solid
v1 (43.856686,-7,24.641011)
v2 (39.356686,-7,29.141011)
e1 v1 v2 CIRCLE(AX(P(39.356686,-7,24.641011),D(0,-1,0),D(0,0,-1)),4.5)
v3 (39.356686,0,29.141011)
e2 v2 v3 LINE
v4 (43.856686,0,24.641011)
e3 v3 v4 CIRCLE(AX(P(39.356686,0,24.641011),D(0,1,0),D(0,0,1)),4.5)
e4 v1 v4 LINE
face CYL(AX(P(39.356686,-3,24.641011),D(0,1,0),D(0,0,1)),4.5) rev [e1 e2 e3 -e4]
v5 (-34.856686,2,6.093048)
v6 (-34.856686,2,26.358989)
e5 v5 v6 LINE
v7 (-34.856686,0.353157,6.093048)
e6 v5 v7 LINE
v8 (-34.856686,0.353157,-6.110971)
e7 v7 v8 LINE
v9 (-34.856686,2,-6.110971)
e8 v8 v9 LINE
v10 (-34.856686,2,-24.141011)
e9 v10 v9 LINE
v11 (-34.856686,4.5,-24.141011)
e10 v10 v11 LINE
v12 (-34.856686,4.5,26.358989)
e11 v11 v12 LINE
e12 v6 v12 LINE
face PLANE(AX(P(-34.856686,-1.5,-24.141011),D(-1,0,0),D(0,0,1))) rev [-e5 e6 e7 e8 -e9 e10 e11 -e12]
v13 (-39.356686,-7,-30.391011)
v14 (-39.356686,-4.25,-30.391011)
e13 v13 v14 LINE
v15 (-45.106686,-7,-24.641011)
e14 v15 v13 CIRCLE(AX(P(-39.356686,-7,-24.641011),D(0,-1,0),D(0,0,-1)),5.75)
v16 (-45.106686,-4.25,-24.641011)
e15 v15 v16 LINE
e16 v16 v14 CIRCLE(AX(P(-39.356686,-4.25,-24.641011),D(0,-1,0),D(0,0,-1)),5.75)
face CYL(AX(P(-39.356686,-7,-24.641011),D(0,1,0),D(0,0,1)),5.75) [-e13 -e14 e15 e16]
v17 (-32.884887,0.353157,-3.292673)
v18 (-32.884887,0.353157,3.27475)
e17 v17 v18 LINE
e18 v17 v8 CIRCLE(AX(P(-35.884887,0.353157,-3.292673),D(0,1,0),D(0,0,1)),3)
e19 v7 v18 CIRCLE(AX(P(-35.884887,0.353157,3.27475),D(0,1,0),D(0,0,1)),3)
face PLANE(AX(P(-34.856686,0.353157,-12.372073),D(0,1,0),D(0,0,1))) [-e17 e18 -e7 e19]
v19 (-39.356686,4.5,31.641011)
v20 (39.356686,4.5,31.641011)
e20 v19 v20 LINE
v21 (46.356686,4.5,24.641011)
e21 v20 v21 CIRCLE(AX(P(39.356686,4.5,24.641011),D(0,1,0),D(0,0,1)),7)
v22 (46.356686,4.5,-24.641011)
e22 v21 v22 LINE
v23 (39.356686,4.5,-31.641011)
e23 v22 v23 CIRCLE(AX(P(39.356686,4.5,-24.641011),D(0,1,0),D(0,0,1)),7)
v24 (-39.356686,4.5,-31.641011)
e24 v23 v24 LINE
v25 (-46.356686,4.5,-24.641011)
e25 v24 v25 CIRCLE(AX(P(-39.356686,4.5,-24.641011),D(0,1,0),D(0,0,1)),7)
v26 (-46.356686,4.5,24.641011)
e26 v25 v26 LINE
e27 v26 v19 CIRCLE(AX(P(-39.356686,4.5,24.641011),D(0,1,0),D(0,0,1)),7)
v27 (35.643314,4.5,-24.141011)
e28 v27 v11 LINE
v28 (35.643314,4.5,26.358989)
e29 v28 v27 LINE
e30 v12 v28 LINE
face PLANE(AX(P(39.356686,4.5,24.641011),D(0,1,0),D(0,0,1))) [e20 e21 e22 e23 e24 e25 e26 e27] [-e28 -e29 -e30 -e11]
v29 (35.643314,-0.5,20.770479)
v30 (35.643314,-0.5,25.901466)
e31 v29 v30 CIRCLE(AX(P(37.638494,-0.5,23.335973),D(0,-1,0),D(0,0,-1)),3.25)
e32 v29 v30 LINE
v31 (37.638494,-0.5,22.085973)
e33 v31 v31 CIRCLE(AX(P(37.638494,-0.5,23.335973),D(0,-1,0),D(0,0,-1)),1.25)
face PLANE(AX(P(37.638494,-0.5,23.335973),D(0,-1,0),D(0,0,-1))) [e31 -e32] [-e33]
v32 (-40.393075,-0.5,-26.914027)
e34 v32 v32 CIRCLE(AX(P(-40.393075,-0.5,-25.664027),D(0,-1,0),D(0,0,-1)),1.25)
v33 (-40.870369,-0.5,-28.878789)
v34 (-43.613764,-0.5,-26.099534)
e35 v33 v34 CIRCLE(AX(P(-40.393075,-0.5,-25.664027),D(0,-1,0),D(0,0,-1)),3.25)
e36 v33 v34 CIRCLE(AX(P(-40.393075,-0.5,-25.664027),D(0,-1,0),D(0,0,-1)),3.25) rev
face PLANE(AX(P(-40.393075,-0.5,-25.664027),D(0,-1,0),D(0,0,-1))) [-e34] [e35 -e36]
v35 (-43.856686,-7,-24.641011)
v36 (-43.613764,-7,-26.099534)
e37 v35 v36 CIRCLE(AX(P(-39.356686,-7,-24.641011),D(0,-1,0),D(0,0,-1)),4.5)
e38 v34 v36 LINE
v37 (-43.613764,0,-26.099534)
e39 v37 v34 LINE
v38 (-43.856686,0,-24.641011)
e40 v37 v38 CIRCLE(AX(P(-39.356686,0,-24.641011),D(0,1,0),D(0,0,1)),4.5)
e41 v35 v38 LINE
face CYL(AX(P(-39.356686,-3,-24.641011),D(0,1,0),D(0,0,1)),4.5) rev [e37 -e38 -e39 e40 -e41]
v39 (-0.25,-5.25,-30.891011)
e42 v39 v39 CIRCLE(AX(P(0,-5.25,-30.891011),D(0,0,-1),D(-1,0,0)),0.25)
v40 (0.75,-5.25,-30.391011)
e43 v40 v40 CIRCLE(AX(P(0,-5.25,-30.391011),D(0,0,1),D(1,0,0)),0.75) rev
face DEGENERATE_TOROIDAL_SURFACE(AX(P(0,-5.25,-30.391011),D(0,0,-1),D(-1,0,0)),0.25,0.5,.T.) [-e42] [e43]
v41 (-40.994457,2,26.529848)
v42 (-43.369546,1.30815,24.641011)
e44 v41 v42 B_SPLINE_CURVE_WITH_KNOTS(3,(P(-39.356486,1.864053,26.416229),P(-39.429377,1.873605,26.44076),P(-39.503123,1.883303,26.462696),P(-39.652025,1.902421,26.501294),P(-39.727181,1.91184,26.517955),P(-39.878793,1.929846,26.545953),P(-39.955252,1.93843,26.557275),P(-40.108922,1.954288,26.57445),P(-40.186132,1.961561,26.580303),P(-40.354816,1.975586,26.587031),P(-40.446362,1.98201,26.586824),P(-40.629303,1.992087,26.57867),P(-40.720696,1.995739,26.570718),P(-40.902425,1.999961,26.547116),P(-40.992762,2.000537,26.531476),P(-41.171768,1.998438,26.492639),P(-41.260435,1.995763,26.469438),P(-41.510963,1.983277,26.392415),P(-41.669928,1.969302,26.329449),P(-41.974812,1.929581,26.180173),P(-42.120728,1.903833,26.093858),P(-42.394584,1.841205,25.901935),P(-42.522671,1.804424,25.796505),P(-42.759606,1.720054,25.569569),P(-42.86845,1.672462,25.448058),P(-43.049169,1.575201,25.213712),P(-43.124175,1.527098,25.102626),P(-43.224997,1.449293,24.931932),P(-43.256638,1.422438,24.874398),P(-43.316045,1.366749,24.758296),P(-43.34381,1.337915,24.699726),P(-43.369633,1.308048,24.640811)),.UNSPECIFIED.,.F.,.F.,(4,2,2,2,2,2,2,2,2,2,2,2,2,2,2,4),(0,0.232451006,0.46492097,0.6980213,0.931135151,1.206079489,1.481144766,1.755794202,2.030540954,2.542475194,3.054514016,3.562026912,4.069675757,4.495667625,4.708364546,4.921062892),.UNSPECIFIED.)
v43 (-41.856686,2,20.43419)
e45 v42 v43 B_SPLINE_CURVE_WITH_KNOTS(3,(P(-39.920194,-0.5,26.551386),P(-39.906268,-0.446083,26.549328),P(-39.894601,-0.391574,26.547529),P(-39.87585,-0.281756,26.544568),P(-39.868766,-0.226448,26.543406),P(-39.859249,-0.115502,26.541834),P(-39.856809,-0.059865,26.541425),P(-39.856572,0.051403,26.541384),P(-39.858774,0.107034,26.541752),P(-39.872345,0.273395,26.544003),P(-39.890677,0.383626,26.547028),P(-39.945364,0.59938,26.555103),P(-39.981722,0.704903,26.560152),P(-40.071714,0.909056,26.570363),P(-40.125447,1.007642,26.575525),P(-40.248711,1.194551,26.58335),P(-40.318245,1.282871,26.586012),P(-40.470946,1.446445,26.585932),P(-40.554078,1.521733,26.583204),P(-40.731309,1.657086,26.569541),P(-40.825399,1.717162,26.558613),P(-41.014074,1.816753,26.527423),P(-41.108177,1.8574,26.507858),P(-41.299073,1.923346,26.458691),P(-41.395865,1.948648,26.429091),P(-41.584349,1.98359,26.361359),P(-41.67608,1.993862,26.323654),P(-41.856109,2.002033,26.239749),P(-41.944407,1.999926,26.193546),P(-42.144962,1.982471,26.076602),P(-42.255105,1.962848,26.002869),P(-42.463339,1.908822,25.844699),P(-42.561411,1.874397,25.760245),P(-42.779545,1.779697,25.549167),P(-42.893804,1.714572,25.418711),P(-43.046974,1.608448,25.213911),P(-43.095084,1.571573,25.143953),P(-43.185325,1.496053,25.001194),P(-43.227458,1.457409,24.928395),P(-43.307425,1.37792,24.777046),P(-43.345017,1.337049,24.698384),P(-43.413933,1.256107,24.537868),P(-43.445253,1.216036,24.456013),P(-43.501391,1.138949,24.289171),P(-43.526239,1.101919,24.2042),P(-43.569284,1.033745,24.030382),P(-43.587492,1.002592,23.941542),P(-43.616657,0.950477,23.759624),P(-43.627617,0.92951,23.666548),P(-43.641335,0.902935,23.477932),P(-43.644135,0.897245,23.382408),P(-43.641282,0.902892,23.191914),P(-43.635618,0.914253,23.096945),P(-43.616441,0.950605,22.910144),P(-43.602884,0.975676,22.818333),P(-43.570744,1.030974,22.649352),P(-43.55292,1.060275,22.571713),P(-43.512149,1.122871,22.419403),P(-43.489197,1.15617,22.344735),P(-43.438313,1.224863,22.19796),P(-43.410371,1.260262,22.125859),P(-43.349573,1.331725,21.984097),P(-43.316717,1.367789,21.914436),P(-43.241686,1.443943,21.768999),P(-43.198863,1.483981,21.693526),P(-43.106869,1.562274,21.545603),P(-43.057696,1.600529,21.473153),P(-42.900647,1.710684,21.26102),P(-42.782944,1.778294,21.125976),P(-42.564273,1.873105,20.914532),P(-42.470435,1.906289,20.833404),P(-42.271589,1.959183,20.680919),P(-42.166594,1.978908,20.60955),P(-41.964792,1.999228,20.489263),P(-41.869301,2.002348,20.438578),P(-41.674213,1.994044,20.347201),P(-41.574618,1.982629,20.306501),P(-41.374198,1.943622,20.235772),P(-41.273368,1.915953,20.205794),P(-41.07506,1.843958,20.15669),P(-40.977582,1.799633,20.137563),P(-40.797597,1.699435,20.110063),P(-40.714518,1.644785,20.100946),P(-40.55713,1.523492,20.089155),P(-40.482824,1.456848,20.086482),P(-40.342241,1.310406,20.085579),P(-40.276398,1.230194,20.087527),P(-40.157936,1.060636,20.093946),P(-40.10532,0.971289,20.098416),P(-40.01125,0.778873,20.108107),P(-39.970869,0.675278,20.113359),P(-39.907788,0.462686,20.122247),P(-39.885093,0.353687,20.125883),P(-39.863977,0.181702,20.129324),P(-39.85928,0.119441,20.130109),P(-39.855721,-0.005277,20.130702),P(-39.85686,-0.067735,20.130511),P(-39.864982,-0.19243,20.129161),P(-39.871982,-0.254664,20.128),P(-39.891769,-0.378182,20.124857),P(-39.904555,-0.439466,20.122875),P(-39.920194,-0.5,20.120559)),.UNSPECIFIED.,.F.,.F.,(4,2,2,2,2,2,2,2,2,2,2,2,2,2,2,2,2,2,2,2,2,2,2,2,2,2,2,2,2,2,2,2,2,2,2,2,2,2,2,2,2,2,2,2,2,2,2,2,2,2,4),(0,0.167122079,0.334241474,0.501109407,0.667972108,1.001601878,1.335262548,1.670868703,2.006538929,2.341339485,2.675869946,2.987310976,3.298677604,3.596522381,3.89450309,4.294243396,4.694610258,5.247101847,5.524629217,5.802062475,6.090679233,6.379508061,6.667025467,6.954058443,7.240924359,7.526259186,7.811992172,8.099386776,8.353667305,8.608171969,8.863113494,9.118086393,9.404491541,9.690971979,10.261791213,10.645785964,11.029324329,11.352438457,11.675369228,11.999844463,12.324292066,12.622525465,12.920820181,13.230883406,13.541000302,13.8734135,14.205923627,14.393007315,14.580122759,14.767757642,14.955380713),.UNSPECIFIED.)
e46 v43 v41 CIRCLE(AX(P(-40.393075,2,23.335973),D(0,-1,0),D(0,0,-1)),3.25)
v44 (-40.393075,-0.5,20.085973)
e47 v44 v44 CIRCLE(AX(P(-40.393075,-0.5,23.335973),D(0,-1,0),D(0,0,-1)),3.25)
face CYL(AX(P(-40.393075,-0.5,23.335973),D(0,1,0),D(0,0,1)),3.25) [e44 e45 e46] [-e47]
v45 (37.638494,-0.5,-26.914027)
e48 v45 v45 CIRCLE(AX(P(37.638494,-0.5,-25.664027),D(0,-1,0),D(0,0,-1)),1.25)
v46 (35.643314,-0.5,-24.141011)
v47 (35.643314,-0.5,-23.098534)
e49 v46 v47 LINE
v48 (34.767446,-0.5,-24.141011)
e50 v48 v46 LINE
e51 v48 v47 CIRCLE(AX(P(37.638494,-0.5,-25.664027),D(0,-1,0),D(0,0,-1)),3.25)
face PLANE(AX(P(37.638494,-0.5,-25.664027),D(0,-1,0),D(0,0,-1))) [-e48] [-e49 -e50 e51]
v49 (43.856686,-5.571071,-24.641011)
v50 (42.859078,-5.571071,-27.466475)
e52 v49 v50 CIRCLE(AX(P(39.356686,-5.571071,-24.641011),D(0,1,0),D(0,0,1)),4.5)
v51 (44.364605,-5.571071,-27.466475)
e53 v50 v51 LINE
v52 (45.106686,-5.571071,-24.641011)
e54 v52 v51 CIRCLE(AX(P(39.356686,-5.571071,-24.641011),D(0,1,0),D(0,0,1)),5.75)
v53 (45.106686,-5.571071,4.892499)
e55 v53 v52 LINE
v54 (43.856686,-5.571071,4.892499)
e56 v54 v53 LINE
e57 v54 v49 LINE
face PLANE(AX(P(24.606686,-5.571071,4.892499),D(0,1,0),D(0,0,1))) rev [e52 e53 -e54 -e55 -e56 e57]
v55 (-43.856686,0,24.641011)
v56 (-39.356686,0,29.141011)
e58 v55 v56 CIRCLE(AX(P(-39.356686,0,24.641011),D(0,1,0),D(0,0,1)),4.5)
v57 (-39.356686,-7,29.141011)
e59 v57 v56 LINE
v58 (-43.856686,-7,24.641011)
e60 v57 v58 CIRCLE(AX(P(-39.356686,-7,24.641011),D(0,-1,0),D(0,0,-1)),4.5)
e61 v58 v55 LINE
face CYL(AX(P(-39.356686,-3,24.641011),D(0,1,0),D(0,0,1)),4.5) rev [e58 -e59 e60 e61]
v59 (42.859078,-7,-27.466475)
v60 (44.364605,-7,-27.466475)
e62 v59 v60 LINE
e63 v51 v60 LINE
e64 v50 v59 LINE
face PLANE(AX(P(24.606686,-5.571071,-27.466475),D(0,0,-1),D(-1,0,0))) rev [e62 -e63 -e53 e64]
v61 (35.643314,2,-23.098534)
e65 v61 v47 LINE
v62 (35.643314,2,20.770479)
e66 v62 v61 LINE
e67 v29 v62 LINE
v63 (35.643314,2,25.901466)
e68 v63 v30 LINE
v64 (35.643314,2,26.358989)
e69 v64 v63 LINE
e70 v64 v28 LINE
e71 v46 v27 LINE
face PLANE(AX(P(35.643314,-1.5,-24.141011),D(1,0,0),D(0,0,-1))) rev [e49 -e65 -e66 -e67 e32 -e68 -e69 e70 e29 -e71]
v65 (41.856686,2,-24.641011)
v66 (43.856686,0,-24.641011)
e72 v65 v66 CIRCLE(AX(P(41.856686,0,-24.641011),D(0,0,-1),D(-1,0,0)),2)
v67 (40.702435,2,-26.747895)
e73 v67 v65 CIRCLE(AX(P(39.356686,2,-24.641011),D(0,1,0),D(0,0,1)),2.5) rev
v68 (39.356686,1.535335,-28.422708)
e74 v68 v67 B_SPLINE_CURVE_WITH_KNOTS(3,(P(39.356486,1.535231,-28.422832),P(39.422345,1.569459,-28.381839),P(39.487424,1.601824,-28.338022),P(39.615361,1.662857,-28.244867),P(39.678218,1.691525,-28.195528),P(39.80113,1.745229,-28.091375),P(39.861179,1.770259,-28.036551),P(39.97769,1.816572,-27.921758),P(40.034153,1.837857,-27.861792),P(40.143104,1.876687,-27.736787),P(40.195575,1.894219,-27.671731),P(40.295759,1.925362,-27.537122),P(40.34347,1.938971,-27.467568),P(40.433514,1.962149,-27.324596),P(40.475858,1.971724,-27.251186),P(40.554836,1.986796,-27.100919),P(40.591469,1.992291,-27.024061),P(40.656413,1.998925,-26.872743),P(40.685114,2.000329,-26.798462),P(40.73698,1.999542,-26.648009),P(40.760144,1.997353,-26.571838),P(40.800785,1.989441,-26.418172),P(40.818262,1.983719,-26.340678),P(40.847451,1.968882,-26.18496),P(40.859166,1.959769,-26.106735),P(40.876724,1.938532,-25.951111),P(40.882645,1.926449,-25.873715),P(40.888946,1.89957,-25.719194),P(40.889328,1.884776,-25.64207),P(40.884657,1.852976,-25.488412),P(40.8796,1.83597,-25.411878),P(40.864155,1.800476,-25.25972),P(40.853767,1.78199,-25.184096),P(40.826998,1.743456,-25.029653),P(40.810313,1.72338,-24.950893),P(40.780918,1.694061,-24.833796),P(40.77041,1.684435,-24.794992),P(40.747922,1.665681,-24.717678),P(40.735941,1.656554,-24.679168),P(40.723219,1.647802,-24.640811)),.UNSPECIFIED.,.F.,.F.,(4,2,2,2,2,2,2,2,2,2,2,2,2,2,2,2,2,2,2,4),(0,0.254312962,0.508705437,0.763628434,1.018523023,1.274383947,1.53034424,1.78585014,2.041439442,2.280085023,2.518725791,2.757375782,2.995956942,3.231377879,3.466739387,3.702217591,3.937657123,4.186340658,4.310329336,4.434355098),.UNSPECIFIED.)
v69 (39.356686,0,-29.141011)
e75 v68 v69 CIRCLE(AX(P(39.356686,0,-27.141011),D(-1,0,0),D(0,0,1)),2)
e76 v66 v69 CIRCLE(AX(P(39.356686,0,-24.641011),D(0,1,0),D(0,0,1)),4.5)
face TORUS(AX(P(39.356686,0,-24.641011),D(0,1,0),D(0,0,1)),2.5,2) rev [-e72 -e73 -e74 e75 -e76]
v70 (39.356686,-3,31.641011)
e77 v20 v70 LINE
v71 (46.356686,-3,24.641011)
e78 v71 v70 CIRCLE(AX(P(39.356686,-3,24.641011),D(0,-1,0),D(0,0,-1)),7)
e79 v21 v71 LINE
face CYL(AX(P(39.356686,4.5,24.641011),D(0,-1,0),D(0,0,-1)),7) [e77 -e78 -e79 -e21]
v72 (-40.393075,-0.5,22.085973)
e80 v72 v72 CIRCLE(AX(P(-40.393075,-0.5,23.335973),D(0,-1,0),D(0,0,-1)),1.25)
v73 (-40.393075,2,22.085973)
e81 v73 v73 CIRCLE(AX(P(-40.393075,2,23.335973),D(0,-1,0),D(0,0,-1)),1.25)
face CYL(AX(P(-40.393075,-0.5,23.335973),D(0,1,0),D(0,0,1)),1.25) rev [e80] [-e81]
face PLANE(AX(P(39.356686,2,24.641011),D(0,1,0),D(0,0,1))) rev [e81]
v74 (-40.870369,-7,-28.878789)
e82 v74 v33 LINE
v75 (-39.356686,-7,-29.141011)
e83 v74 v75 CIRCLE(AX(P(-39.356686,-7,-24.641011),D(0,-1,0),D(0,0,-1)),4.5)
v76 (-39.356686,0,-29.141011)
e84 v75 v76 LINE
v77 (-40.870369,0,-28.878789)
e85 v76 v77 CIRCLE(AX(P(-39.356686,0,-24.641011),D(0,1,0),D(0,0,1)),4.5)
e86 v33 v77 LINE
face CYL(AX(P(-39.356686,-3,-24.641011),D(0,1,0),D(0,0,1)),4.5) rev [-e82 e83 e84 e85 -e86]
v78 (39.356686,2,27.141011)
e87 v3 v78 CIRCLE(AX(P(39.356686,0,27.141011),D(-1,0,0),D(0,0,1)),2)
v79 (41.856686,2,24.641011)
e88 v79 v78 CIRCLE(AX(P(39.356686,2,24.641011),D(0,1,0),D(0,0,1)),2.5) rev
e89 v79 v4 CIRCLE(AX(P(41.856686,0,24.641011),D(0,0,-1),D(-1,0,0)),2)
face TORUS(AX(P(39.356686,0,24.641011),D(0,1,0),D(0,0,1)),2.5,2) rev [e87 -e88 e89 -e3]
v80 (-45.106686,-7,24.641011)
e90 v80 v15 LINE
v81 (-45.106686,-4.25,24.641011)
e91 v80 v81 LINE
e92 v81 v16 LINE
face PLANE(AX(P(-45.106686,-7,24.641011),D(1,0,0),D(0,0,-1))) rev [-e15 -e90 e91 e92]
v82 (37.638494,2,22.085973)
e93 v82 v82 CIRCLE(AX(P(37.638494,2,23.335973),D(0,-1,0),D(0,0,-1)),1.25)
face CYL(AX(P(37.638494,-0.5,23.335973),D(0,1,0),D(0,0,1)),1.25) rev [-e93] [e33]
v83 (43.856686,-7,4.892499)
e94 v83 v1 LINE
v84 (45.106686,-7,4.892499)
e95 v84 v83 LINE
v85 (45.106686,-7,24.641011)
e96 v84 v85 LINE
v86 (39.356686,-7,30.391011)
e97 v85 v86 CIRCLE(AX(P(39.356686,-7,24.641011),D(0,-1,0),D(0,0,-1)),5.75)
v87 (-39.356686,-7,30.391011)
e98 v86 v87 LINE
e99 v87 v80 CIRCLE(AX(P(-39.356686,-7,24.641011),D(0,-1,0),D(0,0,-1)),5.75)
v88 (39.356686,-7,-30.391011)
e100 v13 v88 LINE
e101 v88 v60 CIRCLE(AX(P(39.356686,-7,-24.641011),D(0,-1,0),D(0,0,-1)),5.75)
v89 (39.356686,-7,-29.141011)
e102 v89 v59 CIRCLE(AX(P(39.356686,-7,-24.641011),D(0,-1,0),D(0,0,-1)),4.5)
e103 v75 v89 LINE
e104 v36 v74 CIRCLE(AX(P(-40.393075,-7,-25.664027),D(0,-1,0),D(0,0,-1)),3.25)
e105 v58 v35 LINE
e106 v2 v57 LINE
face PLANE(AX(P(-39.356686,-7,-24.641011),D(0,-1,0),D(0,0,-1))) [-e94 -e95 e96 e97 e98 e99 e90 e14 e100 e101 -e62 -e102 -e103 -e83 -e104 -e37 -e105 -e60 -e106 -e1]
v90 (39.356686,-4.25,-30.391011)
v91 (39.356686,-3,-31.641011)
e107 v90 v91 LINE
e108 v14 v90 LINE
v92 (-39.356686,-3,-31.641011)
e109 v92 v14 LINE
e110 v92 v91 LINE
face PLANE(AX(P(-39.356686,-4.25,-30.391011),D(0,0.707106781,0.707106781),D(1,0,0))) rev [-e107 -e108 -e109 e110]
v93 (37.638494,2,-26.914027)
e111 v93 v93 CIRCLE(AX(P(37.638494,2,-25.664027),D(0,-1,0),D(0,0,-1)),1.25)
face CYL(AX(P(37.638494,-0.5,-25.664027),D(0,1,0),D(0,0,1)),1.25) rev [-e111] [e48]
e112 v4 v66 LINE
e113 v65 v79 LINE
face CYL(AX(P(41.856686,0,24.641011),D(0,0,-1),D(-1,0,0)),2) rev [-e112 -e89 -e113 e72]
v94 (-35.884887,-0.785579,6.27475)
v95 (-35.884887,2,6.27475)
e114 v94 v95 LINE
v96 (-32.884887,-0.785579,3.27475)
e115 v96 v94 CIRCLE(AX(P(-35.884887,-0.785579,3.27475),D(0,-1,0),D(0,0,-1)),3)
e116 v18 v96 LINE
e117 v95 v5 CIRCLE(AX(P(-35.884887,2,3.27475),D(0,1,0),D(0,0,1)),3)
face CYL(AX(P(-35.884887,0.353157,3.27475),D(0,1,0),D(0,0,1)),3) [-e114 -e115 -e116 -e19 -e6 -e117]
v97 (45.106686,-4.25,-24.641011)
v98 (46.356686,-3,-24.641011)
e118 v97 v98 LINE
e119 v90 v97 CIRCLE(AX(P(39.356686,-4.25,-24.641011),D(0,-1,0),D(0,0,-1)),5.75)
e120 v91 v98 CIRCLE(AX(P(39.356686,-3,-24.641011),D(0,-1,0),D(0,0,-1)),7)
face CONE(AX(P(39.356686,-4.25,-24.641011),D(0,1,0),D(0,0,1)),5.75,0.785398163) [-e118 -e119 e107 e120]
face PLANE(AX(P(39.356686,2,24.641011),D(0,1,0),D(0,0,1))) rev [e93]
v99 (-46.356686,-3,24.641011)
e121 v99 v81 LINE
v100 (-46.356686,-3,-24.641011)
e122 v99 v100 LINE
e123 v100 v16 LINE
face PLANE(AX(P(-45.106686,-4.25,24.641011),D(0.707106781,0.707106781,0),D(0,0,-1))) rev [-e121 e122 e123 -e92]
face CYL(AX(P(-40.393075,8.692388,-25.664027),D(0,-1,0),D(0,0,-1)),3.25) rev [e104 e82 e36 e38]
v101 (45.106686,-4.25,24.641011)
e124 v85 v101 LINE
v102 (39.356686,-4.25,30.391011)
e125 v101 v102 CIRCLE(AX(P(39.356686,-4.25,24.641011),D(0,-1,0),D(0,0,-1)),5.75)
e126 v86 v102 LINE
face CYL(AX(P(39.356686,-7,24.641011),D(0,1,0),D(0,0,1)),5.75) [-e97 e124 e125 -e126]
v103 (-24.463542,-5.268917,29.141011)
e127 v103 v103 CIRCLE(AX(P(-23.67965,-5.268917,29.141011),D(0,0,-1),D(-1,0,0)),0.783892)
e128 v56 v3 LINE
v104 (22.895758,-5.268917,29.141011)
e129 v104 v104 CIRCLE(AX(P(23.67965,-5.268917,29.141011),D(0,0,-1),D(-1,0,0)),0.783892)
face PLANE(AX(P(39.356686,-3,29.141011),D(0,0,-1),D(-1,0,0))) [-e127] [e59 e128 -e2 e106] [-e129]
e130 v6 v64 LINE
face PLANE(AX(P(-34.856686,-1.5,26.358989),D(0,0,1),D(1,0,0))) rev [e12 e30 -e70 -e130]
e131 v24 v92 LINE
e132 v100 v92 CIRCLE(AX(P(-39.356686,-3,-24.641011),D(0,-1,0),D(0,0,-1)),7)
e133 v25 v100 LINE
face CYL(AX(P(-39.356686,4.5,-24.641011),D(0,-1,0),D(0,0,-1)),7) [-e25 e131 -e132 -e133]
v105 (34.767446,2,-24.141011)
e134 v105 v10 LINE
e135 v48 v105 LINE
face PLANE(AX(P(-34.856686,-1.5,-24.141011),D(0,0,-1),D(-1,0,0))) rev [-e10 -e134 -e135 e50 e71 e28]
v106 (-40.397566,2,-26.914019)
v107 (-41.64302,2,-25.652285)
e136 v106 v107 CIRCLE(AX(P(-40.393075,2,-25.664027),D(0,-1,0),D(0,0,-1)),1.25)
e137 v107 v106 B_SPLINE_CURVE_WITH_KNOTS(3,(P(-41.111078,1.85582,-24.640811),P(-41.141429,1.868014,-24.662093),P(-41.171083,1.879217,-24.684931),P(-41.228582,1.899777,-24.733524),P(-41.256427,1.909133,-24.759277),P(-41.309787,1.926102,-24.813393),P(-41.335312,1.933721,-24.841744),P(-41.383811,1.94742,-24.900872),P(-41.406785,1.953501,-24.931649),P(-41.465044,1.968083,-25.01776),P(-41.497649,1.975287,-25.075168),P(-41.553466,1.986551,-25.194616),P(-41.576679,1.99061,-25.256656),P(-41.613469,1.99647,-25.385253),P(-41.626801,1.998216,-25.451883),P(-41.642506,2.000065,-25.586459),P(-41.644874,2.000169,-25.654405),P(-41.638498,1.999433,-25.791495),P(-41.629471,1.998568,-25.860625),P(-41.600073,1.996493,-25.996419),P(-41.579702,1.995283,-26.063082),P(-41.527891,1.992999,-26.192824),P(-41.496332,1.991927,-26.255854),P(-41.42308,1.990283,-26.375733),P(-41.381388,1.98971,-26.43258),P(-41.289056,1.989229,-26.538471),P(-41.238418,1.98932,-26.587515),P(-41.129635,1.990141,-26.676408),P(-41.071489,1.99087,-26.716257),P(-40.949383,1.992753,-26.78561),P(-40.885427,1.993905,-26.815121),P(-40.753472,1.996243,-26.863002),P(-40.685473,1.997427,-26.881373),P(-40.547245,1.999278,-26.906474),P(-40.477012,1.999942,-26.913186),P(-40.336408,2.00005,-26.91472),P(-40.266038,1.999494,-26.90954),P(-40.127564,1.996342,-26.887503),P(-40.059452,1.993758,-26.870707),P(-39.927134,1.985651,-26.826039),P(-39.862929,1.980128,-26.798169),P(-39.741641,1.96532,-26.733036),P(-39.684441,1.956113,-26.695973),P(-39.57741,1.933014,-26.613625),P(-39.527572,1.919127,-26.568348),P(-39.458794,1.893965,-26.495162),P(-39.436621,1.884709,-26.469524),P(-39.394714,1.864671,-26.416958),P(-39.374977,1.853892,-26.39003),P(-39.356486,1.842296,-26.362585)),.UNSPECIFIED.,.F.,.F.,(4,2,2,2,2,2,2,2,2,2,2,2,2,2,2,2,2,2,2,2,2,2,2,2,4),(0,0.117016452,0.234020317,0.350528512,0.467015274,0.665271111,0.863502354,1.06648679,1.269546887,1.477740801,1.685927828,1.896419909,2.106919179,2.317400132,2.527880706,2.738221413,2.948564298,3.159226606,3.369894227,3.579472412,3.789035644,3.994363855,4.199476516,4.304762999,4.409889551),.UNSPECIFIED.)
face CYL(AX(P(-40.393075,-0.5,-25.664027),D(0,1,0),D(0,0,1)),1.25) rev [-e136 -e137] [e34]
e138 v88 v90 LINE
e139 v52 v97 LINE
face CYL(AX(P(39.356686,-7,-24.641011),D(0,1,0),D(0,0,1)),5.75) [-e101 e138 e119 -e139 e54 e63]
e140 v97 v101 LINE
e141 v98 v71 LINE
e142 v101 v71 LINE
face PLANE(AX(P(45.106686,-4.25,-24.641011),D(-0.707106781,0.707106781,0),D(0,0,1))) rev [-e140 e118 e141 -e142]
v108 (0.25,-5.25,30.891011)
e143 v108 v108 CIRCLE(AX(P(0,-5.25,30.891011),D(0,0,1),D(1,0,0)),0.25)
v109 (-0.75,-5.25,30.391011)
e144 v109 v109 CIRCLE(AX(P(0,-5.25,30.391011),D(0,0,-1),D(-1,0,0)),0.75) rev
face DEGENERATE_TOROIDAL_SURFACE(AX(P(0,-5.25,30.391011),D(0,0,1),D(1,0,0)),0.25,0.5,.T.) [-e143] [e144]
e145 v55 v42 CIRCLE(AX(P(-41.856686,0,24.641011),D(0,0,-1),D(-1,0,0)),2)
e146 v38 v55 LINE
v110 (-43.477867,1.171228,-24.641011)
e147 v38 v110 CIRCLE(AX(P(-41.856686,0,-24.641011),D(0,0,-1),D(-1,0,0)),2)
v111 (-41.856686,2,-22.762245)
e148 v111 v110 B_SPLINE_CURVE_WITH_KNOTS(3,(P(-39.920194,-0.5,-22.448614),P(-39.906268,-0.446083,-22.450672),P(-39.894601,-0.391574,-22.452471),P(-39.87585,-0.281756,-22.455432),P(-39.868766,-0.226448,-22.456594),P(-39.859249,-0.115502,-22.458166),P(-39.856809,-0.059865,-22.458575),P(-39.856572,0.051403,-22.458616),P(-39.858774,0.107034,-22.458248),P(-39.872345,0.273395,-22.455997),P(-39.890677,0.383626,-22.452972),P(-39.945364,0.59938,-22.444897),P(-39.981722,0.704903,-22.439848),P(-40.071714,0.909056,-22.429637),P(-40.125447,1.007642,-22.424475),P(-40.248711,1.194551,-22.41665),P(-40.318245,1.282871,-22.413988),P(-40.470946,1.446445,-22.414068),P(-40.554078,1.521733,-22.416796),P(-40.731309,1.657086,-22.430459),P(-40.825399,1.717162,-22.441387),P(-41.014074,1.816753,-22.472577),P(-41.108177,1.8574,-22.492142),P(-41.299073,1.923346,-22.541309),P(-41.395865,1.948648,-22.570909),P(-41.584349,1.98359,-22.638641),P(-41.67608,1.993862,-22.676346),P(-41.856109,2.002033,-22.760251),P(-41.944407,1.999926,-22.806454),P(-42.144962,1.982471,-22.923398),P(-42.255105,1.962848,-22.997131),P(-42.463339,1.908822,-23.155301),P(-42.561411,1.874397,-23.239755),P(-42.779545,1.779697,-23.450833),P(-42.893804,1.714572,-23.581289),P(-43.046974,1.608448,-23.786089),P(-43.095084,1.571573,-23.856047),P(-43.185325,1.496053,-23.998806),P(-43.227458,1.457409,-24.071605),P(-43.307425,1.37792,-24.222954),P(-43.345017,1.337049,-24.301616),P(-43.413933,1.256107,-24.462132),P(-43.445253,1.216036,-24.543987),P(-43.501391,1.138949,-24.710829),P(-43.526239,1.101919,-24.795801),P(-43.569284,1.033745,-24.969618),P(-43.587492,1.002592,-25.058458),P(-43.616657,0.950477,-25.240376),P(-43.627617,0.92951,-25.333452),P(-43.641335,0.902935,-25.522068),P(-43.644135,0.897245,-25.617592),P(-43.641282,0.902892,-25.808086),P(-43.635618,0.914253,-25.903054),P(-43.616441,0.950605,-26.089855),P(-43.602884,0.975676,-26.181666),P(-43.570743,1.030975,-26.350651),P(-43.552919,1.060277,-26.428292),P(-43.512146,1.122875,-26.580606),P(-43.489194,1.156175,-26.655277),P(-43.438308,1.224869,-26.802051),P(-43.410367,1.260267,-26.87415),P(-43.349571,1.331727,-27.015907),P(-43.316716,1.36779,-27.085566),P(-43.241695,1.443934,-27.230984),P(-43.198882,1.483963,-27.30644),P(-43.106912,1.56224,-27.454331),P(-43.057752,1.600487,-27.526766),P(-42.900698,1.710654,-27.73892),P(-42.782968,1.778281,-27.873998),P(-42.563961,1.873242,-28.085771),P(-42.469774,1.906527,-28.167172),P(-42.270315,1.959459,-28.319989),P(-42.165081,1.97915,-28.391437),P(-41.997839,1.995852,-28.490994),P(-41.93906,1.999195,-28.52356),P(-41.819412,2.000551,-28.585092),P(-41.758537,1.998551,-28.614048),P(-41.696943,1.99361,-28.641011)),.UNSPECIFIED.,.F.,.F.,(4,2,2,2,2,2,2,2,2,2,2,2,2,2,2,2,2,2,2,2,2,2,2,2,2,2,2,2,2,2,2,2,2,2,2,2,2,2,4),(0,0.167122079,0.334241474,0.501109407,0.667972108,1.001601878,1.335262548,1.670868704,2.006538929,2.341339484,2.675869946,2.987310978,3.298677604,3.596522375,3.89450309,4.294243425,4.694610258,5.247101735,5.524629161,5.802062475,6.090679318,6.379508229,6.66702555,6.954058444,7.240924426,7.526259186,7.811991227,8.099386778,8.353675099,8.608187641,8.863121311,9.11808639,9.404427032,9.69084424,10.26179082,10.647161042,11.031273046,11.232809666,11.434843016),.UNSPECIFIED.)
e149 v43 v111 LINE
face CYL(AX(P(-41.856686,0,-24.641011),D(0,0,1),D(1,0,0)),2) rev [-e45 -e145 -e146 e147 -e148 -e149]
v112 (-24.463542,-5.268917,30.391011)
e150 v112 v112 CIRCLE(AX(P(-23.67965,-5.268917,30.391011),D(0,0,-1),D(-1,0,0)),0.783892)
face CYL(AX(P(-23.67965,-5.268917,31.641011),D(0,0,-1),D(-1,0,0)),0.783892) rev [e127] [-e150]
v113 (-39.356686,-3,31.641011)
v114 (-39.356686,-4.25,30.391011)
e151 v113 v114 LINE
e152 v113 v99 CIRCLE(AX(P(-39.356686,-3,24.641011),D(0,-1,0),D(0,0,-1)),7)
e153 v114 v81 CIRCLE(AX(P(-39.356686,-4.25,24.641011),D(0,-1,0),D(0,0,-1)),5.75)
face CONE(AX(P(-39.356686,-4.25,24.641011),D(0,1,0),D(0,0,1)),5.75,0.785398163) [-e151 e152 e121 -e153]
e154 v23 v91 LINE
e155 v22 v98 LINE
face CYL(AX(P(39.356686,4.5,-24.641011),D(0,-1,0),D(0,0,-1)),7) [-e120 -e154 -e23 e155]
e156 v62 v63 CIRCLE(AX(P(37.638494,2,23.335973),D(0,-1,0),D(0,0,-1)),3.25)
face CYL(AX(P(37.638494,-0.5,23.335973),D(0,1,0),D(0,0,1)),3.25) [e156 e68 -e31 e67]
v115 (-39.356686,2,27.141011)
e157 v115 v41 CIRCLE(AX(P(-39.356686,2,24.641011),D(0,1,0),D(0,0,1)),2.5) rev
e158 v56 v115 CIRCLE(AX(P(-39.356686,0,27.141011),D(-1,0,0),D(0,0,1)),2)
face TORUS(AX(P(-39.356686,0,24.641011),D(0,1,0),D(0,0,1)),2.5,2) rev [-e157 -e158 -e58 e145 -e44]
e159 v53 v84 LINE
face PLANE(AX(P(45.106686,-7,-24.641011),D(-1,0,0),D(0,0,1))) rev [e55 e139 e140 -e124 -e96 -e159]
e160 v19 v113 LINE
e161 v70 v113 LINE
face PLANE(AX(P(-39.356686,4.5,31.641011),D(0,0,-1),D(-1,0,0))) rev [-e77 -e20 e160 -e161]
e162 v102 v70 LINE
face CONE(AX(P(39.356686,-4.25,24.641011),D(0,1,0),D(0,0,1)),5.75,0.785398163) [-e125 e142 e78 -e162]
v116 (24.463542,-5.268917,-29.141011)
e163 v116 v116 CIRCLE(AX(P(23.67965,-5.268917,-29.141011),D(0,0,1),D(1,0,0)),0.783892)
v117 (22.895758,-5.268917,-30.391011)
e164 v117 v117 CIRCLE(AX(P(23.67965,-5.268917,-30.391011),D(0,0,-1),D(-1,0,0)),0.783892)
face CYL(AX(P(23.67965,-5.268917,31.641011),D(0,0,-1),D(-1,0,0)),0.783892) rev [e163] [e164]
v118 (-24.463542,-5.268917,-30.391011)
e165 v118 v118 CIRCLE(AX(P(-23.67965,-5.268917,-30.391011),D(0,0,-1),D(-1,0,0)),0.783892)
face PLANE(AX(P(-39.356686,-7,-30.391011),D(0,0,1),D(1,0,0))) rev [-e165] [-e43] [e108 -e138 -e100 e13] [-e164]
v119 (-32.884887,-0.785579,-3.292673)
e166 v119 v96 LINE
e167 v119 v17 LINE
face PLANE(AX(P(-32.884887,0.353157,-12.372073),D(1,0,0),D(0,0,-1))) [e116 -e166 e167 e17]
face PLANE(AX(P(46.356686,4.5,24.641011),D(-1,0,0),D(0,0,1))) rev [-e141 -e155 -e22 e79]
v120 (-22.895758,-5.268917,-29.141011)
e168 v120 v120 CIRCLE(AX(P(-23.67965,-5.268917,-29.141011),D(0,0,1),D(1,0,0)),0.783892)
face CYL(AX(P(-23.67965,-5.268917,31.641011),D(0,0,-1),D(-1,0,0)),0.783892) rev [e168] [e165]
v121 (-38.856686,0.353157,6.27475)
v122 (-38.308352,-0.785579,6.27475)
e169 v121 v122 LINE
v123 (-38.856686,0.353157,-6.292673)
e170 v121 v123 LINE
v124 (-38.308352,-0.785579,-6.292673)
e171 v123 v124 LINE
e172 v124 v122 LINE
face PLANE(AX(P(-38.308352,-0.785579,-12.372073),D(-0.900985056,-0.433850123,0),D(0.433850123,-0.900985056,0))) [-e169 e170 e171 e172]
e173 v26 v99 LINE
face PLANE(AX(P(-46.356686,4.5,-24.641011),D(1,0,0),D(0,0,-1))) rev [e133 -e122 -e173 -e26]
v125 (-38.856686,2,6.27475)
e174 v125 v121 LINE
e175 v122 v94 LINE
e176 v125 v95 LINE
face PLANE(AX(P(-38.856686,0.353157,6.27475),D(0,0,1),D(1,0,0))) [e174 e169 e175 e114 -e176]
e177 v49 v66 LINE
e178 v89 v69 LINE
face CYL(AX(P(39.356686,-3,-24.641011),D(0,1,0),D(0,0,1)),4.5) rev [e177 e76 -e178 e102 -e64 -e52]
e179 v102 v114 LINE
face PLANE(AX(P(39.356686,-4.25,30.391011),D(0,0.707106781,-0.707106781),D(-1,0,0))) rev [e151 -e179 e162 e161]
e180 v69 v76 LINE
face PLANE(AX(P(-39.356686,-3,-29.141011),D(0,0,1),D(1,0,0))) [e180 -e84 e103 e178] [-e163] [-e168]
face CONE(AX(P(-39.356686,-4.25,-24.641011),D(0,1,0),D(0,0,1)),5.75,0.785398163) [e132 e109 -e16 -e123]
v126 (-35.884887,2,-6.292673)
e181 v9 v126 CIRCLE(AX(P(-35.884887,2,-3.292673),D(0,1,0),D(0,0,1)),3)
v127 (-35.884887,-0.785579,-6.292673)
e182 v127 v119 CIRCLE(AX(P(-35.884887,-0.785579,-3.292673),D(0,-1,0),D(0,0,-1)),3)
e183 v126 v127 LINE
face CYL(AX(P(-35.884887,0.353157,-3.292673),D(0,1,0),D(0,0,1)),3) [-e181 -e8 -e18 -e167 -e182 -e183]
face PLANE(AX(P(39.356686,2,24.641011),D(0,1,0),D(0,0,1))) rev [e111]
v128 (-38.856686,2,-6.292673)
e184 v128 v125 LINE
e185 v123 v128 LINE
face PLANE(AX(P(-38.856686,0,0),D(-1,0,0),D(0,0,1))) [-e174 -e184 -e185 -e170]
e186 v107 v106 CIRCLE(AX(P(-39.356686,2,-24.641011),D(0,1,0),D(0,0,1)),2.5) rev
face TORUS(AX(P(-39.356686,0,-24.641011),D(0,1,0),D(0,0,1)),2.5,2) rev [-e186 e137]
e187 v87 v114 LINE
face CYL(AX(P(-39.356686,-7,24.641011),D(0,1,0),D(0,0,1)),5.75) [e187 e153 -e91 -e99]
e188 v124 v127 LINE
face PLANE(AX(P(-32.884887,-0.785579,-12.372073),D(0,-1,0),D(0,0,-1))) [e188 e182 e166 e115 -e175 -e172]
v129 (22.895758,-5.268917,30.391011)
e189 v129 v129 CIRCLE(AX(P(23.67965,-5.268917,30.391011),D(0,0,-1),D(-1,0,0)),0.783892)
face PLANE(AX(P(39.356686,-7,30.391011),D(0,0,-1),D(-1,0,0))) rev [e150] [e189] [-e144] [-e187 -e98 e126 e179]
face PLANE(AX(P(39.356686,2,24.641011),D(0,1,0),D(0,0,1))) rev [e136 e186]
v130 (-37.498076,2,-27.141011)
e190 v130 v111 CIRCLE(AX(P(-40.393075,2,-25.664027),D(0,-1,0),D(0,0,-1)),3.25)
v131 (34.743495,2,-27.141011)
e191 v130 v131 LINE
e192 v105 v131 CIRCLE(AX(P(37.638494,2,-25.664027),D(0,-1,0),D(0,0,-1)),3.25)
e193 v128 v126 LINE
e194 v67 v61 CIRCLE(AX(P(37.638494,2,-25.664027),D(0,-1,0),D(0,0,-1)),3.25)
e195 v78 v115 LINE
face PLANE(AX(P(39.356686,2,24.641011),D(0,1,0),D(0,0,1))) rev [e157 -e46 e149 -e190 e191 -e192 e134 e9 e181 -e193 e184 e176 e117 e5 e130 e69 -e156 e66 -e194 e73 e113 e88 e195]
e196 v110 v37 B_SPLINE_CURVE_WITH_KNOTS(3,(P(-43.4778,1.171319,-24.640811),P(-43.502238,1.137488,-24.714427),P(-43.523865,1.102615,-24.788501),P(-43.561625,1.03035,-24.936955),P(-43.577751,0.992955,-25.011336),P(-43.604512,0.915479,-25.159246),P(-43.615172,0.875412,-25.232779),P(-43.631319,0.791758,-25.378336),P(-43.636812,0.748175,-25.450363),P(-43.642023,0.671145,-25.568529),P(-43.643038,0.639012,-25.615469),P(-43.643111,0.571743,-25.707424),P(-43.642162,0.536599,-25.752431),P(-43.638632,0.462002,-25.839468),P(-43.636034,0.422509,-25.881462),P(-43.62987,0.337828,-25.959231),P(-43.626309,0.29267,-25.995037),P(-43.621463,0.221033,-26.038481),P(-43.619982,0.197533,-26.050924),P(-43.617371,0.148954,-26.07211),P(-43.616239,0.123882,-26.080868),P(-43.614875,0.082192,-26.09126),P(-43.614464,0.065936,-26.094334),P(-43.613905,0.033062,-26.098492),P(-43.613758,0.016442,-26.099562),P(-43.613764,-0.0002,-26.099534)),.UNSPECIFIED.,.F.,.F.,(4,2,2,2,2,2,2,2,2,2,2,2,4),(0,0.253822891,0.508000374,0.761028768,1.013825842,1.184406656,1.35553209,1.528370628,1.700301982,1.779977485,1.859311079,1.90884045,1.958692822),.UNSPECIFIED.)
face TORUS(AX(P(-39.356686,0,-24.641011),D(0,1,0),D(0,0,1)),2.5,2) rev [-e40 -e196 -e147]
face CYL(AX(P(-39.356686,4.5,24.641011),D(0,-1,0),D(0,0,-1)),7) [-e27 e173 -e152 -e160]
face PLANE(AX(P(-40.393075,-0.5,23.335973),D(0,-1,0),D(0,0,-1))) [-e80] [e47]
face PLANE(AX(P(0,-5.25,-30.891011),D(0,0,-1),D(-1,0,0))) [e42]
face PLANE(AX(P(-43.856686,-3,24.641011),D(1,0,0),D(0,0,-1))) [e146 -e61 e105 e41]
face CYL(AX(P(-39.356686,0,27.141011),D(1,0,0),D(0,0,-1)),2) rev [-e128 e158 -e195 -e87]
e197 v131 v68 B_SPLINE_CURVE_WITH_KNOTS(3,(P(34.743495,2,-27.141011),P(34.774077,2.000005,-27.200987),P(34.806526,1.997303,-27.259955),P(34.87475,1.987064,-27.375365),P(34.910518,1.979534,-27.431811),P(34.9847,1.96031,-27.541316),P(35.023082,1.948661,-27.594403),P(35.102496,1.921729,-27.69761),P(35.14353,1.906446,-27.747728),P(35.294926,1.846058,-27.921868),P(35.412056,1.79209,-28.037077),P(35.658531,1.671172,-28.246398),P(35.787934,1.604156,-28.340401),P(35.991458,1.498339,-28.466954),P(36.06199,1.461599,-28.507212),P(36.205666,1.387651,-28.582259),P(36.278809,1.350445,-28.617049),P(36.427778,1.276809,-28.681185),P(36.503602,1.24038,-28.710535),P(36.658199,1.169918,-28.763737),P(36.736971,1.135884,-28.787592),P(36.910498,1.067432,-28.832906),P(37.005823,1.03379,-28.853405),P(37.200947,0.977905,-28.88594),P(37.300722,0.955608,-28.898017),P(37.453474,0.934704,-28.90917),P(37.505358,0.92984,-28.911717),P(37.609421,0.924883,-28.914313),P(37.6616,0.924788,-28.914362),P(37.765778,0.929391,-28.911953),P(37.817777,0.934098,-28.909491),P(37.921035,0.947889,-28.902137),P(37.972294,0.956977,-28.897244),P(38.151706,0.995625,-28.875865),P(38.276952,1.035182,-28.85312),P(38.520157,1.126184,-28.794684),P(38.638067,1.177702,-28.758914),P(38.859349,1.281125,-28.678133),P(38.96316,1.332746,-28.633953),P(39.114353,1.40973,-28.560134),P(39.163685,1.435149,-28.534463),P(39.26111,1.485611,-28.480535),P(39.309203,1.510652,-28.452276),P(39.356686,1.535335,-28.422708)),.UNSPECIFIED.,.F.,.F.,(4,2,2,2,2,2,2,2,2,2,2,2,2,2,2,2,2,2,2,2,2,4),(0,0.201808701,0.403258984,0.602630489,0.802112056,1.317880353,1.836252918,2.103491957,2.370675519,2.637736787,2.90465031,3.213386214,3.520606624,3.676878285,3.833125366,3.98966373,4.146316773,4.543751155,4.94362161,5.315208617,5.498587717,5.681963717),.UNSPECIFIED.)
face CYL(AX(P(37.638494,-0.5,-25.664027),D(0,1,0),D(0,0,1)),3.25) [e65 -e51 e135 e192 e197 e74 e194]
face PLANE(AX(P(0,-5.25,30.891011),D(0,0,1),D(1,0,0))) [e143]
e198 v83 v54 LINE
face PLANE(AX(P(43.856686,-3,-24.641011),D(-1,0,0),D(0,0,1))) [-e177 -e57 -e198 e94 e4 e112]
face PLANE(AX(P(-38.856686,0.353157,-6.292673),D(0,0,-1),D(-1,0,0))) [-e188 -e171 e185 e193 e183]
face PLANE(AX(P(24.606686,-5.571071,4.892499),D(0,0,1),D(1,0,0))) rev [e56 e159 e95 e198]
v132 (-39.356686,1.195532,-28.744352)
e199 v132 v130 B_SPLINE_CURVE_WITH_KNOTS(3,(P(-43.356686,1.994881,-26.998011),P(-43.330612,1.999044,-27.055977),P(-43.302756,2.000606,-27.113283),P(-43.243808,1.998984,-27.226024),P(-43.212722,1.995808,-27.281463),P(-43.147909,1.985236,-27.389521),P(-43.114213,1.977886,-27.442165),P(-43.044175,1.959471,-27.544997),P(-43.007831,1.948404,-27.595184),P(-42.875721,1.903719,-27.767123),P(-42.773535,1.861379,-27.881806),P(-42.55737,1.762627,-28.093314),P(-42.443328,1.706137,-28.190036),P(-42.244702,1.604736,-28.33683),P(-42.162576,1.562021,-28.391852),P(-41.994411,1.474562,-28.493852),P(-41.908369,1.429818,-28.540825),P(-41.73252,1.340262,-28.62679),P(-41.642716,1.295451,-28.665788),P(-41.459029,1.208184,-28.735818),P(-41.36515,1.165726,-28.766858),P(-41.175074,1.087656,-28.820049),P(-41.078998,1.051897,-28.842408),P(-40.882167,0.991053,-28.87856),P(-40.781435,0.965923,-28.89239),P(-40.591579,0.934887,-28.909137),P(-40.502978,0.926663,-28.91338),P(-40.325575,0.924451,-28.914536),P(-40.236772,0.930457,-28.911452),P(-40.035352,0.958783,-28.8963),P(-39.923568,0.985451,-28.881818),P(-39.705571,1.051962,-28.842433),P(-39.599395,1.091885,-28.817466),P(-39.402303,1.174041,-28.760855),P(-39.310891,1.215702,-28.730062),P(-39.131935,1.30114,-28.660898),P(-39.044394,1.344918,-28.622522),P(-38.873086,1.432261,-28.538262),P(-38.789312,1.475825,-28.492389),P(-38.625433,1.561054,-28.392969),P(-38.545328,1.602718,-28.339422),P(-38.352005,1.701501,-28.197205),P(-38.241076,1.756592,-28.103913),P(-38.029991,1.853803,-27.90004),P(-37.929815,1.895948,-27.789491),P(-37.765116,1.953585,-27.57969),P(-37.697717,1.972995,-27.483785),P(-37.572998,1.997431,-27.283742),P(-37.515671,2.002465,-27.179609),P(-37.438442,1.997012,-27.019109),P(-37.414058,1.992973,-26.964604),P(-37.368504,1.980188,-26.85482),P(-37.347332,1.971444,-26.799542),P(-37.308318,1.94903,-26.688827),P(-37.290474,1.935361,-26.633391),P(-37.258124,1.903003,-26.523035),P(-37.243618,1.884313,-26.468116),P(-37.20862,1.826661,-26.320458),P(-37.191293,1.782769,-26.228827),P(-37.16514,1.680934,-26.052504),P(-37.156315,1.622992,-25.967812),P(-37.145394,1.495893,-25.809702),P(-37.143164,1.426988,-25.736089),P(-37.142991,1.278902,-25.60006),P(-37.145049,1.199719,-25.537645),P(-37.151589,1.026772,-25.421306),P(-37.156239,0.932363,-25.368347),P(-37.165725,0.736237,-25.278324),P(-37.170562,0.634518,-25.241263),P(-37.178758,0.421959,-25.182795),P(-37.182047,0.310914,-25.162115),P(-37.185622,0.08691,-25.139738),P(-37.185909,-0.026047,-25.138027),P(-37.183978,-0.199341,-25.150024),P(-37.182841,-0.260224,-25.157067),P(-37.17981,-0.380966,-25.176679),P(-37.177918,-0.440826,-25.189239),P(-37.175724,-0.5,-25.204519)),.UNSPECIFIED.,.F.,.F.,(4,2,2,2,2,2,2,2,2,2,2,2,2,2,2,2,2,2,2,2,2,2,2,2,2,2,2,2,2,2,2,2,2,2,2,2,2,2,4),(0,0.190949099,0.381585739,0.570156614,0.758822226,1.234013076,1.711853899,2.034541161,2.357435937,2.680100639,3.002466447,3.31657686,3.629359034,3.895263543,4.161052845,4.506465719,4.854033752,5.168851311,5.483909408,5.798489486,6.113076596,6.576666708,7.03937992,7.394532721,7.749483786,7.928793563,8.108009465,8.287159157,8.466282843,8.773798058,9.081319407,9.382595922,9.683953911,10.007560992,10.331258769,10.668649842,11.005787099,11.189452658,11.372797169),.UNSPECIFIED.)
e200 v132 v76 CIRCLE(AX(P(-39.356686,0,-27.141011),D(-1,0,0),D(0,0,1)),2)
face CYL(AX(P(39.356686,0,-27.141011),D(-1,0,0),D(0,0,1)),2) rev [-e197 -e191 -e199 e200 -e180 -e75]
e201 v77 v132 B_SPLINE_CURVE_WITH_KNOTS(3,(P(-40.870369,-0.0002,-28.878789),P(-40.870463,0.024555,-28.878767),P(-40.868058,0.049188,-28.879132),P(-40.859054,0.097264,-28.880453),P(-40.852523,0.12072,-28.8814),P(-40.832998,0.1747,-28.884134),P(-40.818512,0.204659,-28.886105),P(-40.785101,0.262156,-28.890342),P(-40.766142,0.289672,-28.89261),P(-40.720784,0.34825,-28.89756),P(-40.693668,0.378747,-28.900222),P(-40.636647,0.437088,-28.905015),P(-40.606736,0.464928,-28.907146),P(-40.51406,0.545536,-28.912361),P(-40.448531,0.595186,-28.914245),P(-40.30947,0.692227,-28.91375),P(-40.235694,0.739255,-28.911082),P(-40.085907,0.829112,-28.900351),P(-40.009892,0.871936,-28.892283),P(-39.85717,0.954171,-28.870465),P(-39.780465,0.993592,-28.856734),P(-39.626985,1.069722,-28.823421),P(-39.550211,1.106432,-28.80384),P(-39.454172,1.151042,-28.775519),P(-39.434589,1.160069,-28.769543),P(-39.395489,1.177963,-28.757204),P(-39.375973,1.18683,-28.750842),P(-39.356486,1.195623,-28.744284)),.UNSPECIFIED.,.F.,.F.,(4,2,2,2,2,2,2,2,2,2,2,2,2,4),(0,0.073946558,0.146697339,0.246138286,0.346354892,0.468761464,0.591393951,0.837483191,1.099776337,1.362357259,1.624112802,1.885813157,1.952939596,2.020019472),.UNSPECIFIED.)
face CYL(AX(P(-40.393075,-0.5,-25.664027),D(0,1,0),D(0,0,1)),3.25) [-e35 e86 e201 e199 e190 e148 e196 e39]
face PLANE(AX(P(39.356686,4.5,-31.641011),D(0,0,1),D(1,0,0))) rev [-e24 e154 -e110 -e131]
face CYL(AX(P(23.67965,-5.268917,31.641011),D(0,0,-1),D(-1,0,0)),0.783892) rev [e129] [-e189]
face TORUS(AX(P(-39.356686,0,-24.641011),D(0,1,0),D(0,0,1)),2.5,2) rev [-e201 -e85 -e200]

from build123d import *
from build123d.topology import SkipClean

# Parameters (mm, degrees)
BOSS_EXTRUDE1_DEPTH = 4.5
SHELL1_T            = -2.5
SKETCH2_W           = 70.5
SKETCH2_H           = 50.5
CUT_EXTRUDE1_DEPTH  = 6
FILLET1_R           = 2
SKETCH3_R           = 3.25
SKETCH3_R_2         = 1.25
BOSS_EXTRUDE2_DEPTH = 2.5
BOSS_EXTRUDE3_START = 3
BOSS_EXTRUDE3_DEPTH = 3
SKETCH5_W           = 12.567423642
SKETCH5_H           = 1.646842997
BOSS_EXTRUDE4_DEPTH = 4
BOSS_EXTRUDE5_DEPTH = 12.567423642
FILLET4_R           = 3
SKETCH8_W           = 70.5
SKETCH8_H           = 50.5
CUT_EXTRUDE2_DEPTH  = 4
BOSS_EXTRUDE6_START = 4
BOSS_EXTRUDE6_DEPTH = 4
CHAMFER1_SIZE       = 1.25
SKETCH11_W          = 15.487290784
SKETCH11_H          = 50.5
CUT_EXTRUDE3_DEPTH  = 24
CUT_EXTRUDE4_START  = -6.5
SKETCH13_R          = 3.25
CUT_EXTRUDE4_DEPTH  = 6.5
SKETCH14_R          = 0.75
BOSS_EXTRUDE7_DEPTH = 0.5
FILLET5_R           = 0.5
BOSS_EXTRUDE8_START = 0.5
SKETCH15_R          = 0.75
BOSS_EXTRUDE8_DEPTH = 0.5
FILLET6_R           = 0.5
SKETCH16_W          = 32.358974192
SKETCH16_H          = 1.7505668
CUT_EXTRUDE5_DEPTH  = 20.5
SKETCH17_R          = 0.783892082
CUT_EXTRUDE6_DEPTH  = 78.755475754


# Some blends are built 0.0001 mm under size
with BuildPart() as part:
    # Sketch1 → Boss-Extrude1 (new body)
    with BuildSketch(Plane(origin=(0, 0, 0), x_dir=(1, 0, 0), z_dir=(0, 1, 0))):
        with BuildLine():
            Line((46.356686108, -24.641010635), (46.356686108, 24.641010635))
            ThreePointArc((46.356686108, 24.641010635), (44.306433576, 29.590758103), (39.356686108, 31.641010635))
            Line((39.356686108, 31.641010635), (-39.356686108, 31.641010635))
            ThreePointArc((-39.356686108, 31.641010635), (-44.306433576, 29.590758103), (-46.356686108, 24.641010635))
            Line((-46.356686108, 24.641010635), (-46.356686108, -24.641010635))
            ThreePointArc((-46.356686108, -24.641010635), (-44.306433576, -29.590758103), (-39.356686108, -31.641010635))
            Line((-39.356686108, -31.641010635), (39.356686108, -31.641010635))
            ThreePointArc((39.356686108, -31.641010635), (44.306433576, -29.590758103), (46.356686108, -24.641010635))
        make_face()
    extrude(amount=BOSS_EXTRUDE1_DEPTH)

    # Shell1
    shell1_openings = [part.faces().sort_by_distance(p)[0] for p in [
        (0, 0, 0),
    ]]
    offset(amount=SHELL1_T, openings=shell1_openings, kind=Kind.INTERSECTION)

    # Sketch2 → Cut-Extrude1 (cut)
    with BuildSketch(Plane(origin=(0, 4.5, 0), x_dir=(1, 0, 0), z_dir=(0, 1, 0))):
        with Locations((0.393313892, -1.108989365)):
            Rectangle(SKETCH2_W, SKETCH2_H)
    extrude(amount=-CUT_EXTRUDE1_DEPTH, mode=Mode.SUBTRACT)

    # Fillet1
    fillet1_edges = [part.edges().sort_by_distance(p)[0] for p in [
        (42.538666623, 2, 27.82299115),
        (0, 2, 29.141010635),
        (-42.538666623, 2, 27.82299115),
        (-43.856686108, 2, 0),
        (-42.538666623, 2, -27.82299115),
        (0, 2, -29.141010635),
        (42.538666623, 2, -27.82299115),
        (43.856686108, 2, 0),
    ]]
    fillet(fillet1_edges, radius=FILLET1_R - 0.0001)  # a hair under: the kernel refuses the full size

    # Sketch3 → Boss-Extrude2 (add)
    # profile 1 of 4: a face of its own
    with BuildSketch(Plane.XZ.offset(-2)):
        with Locations(Location((-40.393075335, 23.335972527, 0), (0, 0, 100.663495608))):
            Circle(SKETCH3_R)
        with Locations(Location((-40.393075335, 23.335972527, 0), (0, 0, 270))):
            Circle(SKETCH3_R_2, mode=Mode.SUBTRACT)
    # profile 2 of 4: a face of its own
    with BuildSketch(Plane.XZ.offset(-2)):
        with Locations(Location((-40.393075335, -25.664027473, 0), (0, 0, 116.76561408))):
            Circle(SKETCH3_R)
        with Locations(Location((-40.393075335, -25.664027473, 0), (0, 0, 179.461771678))):
            Circle(SKETCH3_R_2, mode=Mode.SUBTRACT)
    # profile 3 of 4: a face of its own
    with BuildSketch(Plane.XZ.offset(-2)):
        with Locations(Location((37.638494393, -25.664027473, 0), (0, 0, 127.872158601))):
            Circle(SKETCH3_R)
        with Locations(Location((37.638494393, -25.664027473, 0), (0, 0, 270))):
            Circle(SKETCH3_R_2, mode=Mode.SUBTRACT)
    # profile 4 of 4: a face of its own
    with BuildSketch(Plane.XZ.offset(-2)):
        with Locations(Location((37.638494393, 23.335972526, 0), (0, 0, 127.872158601))):
            Circle(SKETCH3_R)
        with Locations(Location((37.638494393, 23.335972526, 0), (0, 0, 270))):
            Circle(SKETCH3_R_2, mode=Mode.SUBTRACT)
    extrude(amount=BOSS_EXTRUDE2_DEPTH)

    # Sketch4 → Boss-Extrude3 (add)
    with SkipClean():  # the faces are left unmerged after this step: merging them gives an invalid solid
        with BuildSketch(Plane.XZ.offset(BOSS_EXTRUDE3_START)):
            with BuildLine():
                Line((39.356686108, 31.641010635), (-39.356686108, 31.641010635))
                ThreePointArc((-39.356686108, 31.641010635), (-44.306433576, 29.590758103), (-46.356686108, 24.641010635))
                Line((-46.356686108, 24.641010635), (-46.356686108, -24.641010635))
                ThreePointArc((-46.356686108, -24.641010635), (-44.306433576, -29.590758103), (-39.356686108, -31.641010635))
                Line((-39.356686108, -31.641010635), (39.356686108, -31.641010635))
                ThreePointArc((39.356686108, -31.641010635), (44.306433576, -29.590758103), (46.356686108, -24.641010635))
                Line((46.356686108, -24.641010635), (46.356686108, 24.641010635))
                ThreePointArc((46.356686108, 24.641010635), (44.306433576, 29.590758103), (39.356686108, 31.641010635))
            make_face()
            with BuildLine():
                Line((39.356686108, 29.141010635), (-39.356686108, 29.141010635))
                ThreePointArc((-39.356686108, 29.141010635), (-42.538666623, 27.82299115), (-43.856686108, 24.641010635))
                Line((-43.856686108, 24.641010635), (-43.856686108, -24.641010635))
                ThreePointArc((-43.856686108, -24.641010635), (-42.538666623, -27.82299115), (-39.356686108, -29.141010635))
                Line((-39.356686108, -29.141010635), (39.356686108, -29.141010635))
                ThreePointArc((39.356686108, -29.141010635), (42.538666623, -27.82299115), (43.856686108, -24.641010635))
                Line((43.856686108, -24.641010635), (43.856686108, 24.641010635))
                ThreePointArc((43.856686108, 24.641010635), (42.538666623, 27.82299115), (39.356686108, 29.141010635))
            make_face(mode=Mode.SUBTRACT)
        extrude(amount=-BOSS_EXTRUDE3_DEPTH)

    # Sketch5 → Boss-Extrude4 (add)
    with SkipClean():  # the faces are left unmerged after this step: merging them gives an invalid solid
        with BuildSketch(Plane(origin=(-34.856686108, 0, 0), x_dir=(0, 0, -1), z_dir=(1, 0, 0))):
            with Locations((0.008961538, 1.176578502)):
                Rectangle(SKETCH5_W, SKETCH5_H)
        extrude(amount=-BOSS_EXTRUDE4_DEPTH)

    # Sketch6 → Boss-Extrude5 (add)
    with SkipClean():  # the faces are left unmerged after this step: merging them gives an invalid solid
        with BuildSketch(Plane.XY.offset(6.274750283)):
            Polygon((-34.856686108, 0.353157003), (-32.884887287, 0.353157003), (-32.884887287, -0.785578936), (-38.308352122, -0.785578936), (-38.856686108, 0.353157003), align=None)
        extrude(amount=-BOSS_EXTRUDE5_DEPTH)

    # Fillet4
    # the kernel refuses this fillet: 3 mm, written as the material it takes off along each edge
    with BuildSketch(Plane(origin=(-32.884887287, 7.853157003, -6.292673359), x_dir=(-1, 0, 0), z_dir=(0, -1, 0))) as fillet4_piece_1_section:
        with BuildLine():
            CenterArc((FILLET4_R, -FILLET4_R), FILLET4_R, 90, 90)
            Line((0, -FILLET4_R), (0, 0))
            Line((0, 0), (FILLET4_R, 0))
        make_face()
    fillet4_piece_1 = extrude(amount=16.138735939, mode=Mode.PRIVATE)
    fillet4_piece_1 = split(fillet4_piece_1, bisect_by=Plane(origin=(-35.112153747, 2, -6.238457851), z_dir=(0, -1, 0)), keep=Keep.TOP, mode=Mode.PRIVATE)
    add(fillet4_piece_1, mode=Mode.SUBTRACT)
    with BuildSketch(Plane(origin=(-32.884887287, 7.853157003, 6.274750283), x_dir=(-1, 0, 0), z_dir=(0, -1, 0))) as fillet4_piece_2_section:
        with BuildLine():
            CenterArc((FILLET4_R, FILLET4_R), FILLET4_R, 180, 90)
            Line((0, FILLET4_R), (0, 0))
            Line((0, 0), (FILLET4_R, 0))
        make_face()
    fillet4_piece_2 = extrude(amount=16.138735939, mode=Mode.PRIVATE)
    fillet4_piece_2 = split(fillet4_piece_2, bisect_by=Plane(origin=(-35.112153747, 2, 6.220534774), z_dir=(0, -1, 0)), keep=Keep.TOP, mode=Mode.PRIVATE)
    add(fillet4_piece_2, mode=Mode.SUBTRACT)

    # Sketch8 → Cut-Extrude2 (cut)
    with BuildSketch(Plane(origin=(0, 4.5, 0), x_dir=(1, 0, 0), z_dir=(0, 1, 0))):
        with Locations((0.393313892, -1.108989365)):
            Rectangle(SKETCH8_W, SKETCH8_H)
    extrude(amount=-CUT_EXTRUDE2_DEPTH, mode=Mode.SUBTRACT)

    # Sketch10 → Boss-Extrude6 (add)
    with BuildSketch(Plane.XZ.offset(3).offset(BOSS_EXTRUDE6_START)):
        with BuildLine():
            Line((-39.356686108, -30.391010635), (39.356686108, -30.391010635))
            ThreePointArc((39.356686108, -30.391010635), (43.4225501, -28.706874627), (45.106686108, -24.641010635))
            Line((45.106686108, -24.641010635), (45.106686108, 24.641010635))
            ThreePointArc((45.106686108, 24.641010635), (43.4225501, 28.706874627), (39.356686108, 30.391010635))
            Line((39.356686108, 30.391010635), (-39.356686108, 30.391010635))
            ThreePointArc((-39.356686108, 30.391010635), (-43.4225501, 28.706874627), (-45.106686108, 24.641010635))
            Line((-45.106686108, 24.641010635), (-45.106686108, -24.641010635))
            ThreePointArc((-45.106686108, -24.641010635), (-43.4225501, -28.706874627), (-39.356686108, -30.391010635))
        make_face()
        with BuildLine():
            Line((-39.356686108, -29.141010635), (39.356686108, -29.141010635))
            ThreePointArc((39.356686108, -29.141010635), (42.538666623, -27.82299115), (43.856686108, -24.641010635))
            Line((43.856686108, -24.641010635), (43.856686108, 24.641010635))
            ThreePointArc((43.856686108, 24.641010635), (42.538666623, 27.82299115), (39.356686108, 29.141010635))
            Line((39.356686108, 29.141010635), (-39.356686108, 29.141010635))
            ThreePointArc((-39.356686108, 29.141010635), (-42.538666623, 27.82299115), (-43.856686108, 24.641010635))
            Line((-43.856686108, 24.641010635), (-43.856686108, -24.641010635))
            ThreePointArc((-43.856686108, -24.641010635), (-42.538666623, -27.82299115), (-39.356686108, -29.141010635))
        make_face(mode=Mode.SUBTRACT)
    extrude(amount=-BOSS_EXTRUDE6_DEPTH)

    # Chamfer1
    chamfer1_edges = [part.edges().sort_by_distance(p)[0] for p in [
        (-43.4225501, -3, -28.706874627),
        (0, -3, -30.391010635),
        (43.4225501, -3, -28.706874627),
        (45.106686108, -3, 0),
        (43.4225501, -3, 28.706874627),
        (0, -3, 30.391010635),
        (-43.4225501, -3, 28.706874627),
        (-45.106686108, -3, 0),
    ]]
    chamfer(chamfer1_edges, length=CHAMFER1_SIZE - 0.0001)  # a hair under: the kernel refuses the full size

    # Sketch11 → Cut-Extrude3 (cut)
    with BuildSketch(Plane(origin=(0, 4.5, 0), x_dir=(1, 0, 0), z_dir=(0, 1, 0))):
        with Locations((27.8996685, -1.108989365)):
            Rectangle(SKETCH11_W, SKETCH11_H)
    extrude(amount=-CUT_EXTRUDE3_DEPTH, mode=Mode.SUBTRACT)

    # Sketch13 → Cut-Extrude4 (cut)
    with BuildSketch(Plane.XZ.offset(7).offset(CUT_EXTRUDE4_START)):
        with Locations((-40.393075335, -25.664027473)):
            Circle(SKETCH13_R)
    extrude(amount=CUT_EXTRUDE4_DEPTH, mode=Mode.SUBTRACT)

    # Sketch14 → Boss-Extrude7 (add)
    with BuildSketch(Plane(origin=(0, 0, -30.391010635), x_dir=(-1, 0, 0), z_dir=(0, 0, -1))):
        with Locations(Location((0, -5.25, 0), (0, 0, 180))):
            Circle(SKETCH14_R)
    extrude(amount=BOSS_EXTRUDE7_DEPTH)

    # Fillet5
    fillet5_edges = [part.edges().sort_by_distance(p)[0] for p in [
        (-0.75, -5.25, -30.891010635),
    ]]
    fillet(fillet5_edges, radius=FILLET5_R - 0.0001)  # a hair under: the kernel refuses the full size

    # Sketch15 → Boss-Extrude8 (add)
    with BuildSketch(Plane.XY.offset(30.391010635).offset(BOSS_EXTRUDE8_START)):
        with Locations(Location((0, -5.25, 0), (0, 0, 180))):
            Circle(SKETCH15_R)
    extrude(amount=-BOSS_EXTRUDE8_DEPTH)

    # Fillet6
    fillet6_edges = [part.edges().sort_by_distance(p)[0] for p in [
        (0.75, -5.25, 30.891010635),
    ]]
    fillet(fillet6_edges, radius=FILLET6_R - 0.0001)  # a hair under: the kernel refuses the full size

    # Sketch16 → Cut-Extrude5 (cut)
    with BuildSketch(Plane(origin=(45.106686108, 0, 0), x_dir=(0, 0, -1), z_dir=(1, 0, 0))):
        with Locations((11.286987709, -6.446354596)):
            Rectangle(SKETCH16_W, SKETCH16_H)
    extrude(amount=-CUT_EXTRUDE5_DEPTH, mode=Mode.SUBTRACT)

    # Sketch17 → Cut-Extrude6 (cut, through all)
    with BuildSketch(Plane(origin=(0, 0, -30.391010635), x_dir=(-1, 0, 0), z_dir=(0, 0, -1))):
        with Locations((23.679650241, -5.268916998)):
            Circle(SKETCH17_R)
        with Locations((-23.679650241, -5.268916998)):
            Circle(SKETCH17_R)
    extrude(amount=-CUT_EXTRUDE6_DEPTH, mode=Mode.SUBTRACT)


solid = part.part
